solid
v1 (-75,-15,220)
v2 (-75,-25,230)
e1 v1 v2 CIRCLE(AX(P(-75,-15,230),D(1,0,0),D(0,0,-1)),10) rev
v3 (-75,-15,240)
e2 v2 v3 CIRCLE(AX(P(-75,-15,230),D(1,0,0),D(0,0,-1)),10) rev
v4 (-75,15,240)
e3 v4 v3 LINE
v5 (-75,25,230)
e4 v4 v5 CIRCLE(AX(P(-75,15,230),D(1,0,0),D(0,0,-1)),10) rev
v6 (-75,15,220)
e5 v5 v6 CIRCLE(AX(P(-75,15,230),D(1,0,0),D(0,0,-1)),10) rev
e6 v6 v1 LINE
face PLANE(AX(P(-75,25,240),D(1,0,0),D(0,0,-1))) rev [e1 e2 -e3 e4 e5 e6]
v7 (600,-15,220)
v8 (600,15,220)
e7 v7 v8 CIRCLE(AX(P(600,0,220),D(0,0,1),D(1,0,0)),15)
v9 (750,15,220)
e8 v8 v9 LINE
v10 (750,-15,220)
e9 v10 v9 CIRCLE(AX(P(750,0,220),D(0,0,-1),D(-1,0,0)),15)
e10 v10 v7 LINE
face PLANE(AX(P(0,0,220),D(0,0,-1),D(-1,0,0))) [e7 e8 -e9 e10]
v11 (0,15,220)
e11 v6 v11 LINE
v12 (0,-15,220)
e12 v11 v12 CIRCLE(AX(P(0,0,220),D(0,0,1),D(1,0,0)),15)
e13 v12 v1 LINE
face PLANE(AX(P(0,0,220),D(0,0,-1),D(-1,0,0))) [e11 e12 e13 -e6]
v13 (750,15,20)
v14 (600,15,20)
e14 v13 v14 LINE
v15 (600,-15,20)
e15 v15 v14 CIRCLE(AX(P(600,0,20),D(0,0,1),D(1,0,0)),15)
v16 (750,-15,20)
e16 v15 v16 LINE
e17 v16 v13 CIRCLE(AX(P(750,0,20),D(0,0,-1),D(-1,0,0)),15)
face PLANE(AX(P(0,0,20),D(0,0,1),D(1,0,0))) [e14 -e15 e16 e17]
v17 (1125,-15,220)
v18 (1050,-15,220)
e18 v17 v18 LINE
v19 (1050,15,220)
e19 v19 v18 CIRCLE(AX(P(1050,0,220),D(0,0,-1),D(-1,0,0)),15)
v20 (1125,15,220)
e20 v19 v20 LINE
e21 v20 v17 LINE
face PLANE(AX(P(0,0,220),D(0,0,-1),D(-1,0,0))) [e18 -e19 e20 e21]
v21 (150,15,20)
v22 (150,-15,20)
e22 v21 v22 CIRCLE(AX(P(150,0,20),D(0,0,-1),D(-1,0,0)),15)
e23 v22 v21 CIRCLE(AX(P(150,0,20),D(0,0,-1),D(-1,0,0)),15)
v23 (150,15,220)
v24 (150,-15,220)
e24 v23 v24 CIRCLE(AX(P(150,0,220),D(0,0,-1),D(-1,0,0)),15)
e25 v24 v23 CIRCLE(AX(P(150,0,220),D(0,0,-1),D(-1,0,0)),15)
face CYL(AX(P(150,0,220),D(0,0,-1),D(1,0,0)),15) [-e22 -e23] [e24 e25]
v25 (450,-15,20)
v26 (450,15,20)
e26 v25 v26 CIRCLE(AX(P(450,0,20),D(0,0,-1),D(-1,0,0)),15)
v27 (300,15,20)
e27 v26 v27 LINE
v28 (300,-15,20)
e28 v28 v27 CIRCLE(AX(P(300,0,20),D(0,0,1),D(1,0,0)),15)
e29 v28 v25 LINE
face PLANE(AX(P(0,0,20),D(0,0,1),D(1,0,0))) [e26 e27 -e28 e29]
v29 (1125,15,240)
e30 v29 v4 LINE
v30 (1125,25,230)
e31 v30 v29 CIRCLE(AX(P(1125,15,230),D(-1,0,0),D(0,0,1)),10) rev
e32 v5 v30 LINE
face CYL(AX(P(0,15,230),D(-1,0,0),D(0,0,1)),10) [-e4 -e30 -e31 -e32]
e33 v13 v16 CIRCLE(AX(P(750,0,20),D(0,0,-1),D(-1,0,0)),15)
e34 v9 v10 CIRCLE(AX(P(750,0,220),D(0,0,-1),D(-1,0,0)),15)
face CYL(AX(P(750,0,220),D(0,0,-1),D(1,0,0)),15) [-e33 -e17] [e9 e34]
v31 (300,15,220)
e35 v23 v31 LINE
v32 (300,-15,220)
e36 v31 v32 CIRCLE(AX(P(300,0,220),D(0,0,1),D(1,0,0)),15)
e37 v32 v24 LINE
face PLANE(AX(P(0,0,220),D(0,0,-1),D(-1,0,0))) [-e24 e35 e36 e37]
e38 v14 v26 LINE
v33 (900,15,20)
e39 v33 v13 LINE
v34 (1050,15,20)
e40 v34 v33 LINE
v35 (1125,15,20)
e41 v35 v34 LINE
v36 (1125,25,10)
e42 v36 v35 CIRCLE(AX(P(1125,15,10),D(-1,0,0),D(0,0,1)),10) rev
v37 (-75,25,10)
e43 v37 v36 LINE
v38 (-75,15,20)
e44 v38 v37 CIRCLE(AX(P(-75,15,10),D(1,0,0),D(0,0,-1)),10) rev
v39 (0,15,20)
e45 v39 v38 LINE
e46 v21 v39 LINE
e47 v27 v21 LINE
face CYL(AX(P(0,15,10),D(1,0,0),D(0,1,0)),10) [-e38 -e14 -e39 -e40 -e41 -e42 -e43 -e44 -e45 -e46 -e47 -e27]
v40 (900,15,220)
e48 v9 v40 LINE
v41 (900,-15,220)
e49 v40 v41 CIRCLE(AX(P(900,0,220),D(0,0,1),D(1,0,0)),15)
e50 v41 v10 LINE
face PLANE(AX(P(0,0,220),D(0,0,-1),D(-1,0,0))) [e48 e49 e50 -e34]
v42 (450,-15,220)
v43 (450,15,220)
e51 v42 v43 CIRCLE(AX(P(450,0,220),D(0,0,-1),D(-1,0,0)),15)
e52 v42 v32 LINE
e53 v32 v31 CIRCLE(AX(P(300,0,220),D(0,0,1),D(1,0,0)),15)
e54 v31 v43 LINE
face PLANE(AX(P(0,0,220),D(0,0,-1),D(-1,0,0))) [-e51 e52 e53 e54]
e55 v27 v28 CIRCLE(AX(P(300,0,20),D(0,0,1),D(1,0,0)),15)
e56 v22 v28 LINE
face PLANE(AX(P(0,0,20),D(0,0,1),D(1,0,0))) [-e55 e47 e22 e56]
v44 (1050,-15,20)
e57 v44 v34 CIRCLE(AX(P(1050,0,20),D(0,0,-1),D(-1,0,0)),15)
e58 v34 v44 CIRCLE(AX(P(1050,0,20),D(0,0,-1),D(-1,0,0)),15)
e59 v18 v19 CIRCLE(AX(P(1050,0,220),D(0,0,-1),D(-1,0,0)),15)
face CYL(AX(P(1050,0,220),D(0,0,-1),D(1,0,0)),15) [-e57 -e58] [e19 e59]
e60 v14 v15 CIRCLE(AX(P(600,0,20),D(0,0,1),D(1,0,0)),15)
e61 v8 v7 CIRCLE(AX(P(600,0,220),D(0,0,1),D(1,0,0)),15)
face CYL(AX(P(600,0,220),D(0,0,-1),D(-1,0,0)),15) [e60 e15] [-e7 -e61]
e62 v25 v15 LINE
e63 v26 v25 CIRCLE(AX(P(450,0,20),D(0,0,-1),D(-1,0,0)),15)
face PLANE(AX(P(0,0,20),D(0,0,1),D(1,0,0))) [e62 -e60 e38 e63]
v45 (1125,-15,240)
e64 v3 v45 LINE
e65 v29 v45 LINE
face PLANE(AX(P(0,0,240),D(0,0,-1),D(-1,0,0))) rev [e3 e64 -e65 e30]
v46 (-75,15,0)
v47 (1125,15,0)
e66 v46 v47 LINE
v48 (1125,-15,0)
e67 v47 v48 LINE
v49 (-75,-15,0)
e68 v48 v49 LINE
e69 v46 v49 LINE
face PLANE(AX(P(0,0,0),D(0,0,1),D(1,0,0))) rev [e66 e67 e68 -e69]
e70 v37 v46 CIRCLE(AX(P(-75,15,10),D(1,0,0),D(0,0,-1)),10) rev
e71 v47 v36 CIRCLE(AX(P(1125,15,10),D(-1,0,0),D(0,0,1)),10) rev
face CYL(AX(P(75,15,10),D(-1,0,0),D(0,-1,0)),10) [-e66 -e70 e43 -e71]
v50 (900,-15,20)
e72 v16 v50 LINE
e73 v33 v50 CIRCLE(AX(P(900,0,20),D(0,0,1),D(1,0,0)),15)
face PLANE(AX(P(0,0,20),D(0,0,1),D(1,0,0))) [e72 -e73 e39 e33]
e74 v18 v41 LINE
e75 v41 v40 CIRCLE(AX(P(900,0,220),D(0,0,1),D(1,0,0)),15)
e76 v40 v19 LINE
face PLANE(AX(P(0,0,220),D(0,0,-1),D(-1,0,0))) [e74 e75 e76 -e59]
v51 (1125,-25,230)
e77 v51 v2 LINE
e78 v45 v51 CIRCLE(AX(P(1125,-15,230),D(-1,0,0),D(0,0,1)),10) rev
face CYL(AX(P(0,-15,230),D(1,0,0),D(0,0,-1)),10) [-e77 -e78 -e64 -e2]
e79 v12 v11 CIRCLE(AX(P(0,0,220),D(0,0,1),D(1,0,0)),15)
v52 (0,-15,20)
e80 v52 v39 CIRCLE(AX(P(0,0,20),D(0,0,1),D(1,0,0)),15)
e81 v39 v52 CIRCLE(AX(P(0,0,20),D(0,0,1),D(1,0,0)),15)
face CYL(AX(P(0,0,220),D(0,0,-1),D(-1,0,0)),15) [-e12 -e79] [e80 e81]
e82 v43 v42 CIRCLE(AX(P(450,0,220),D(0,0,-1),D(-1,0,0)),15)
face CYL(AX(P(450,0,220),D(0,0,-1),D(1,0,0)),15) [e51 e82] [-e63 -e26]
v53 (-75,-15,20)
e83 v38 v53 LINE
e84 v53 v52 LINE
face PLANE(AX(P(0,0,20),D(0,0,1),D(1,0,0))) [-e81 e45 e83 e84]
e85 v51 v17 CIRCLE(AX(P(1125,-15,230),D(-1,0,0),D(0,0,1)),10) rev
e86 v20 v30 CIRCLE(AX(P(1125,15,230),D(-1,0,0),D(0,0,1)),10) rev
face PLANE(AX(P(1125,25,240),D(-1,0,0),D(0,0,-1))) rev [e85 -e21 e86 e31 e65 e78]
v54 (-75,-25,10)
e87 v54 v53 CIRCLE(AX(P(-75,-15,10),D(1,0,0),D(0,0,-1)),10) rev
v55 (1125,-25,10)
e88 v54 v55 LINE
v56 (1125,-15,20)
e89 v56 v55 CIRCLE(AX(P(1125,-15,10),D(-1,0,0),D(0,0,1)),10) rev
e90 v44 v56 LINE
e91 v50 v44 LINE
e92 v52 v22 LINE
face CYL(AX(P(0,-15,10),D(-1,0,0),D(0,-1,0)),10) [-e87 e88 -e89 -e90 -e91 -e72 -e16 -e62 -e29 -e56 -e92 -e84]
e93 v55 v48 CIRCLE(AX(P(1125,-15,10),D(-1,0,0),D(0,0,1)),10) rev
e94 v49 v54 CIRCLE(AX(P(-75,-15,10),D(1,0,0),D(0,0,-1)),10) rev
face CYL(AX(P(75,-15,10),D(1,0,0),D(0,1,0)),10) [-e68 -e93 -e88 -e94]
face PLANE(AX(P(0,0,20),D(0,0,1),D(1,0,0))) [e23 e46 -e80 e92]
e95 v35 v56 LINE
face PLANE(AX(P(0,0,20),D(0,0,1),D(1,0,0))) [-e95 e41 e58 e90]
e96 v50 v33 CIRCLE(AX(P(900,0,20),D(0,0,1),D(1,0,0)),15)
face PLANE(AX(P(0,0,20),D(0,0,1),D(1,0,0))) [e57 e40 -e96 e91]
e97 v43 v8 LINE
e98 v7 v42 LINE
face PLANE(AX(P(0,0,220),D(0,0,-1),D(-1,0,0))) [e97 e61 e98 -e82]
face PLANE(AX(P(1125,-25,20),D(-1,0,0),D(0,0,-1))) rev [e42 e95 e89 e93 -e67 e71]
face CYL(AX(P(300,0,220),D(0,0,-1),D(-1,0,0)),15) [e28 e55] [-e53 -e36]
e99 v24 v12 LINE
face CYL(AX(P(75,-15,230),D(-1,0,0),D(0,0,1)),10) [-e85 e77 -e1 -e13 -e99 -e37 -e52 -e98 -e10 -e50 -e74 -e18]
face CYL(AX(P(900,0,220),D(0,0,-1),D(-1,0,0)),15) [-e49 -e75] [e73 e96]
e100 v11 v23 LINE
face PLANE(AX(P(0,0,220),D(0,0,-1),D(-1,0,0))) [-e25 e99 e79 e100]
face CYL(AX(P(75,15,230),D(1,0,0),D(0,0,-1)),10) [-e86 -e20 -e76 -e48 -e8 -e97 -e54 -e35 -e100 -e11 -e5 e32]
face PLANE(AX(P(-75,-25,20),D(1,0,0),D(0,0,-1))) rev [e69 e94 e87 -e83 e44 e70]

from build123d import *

# Parameters (mm, degrees)
SKETCH3_W           = 150
SKETCH3_H           = 50
BOSS_EXTRUDE1_DEPTH = 20
SKETCH4_R           = 15
BOSS_EXTRUDE2_DEPTH = 200
SKETCH5_W           = 150
SKETCH5_H           = 50
BOSS_EXTRUDE3_DEPTH = 20
FILLET2_R           = 10


with BuildPart() as part:
    # Sketch3 → Boss-Extrude1 (new body)
    with BuildSketch(Plane.XY):
        Rectangle(SKETCH3_W, SKETCH3_H)
    extrude(amount=BOSS_EXTRUDE1_DEPTH)

    # Sketch4 → Boss-Extrude2 (add)
    with BuildSketch(Plane.XY.offset(20)):
        Circle(SKETCH4_R)
    extrude(amount=BOSS_EXTRUDE2_DEPTH)

    # Sketch5 → Boss-Extrude3 (add)
    with BuildSketch(Plane.XY.offset(220)):
        Rectangle(SKETCH5_W, SKETCH5_H)
    extrude(amount=BOSS_EXTRUDE3_DEPTH)

    # Mirror1: part across plane


with BuildPart() as part_1:
    add(part.part)
    add(part.part.mirror(Plane(origin=(75, -25, 20), x_dir=(0, 0, 1), z_dir=(-1, 0, 0))))

    # Mirror2: part across plane


with BuildPart() as part_2:
    add(part_1.part)
    add(part_1.part.mirror(Plane(origin=(225, 25, 240), x_dir=(0, 0, 1), z_dir=(-1, 0, 0))))

    # Mirror3: part across plane


with BuildPart() as part_3:
    add(part_2.part)
    add(part_2.part.mirror(Plane(origin=(525, 25, 240), x_dir=(0, 0, 1), z_dir=(-1, 0, 0))))

    # Fillet2
    fillet2_edges = [part_3.edges().sort_by_distance(p)[0] for p in [
        (525, -25, 20),
        (525, -25, 0),
        (525, 25, 0),
        (525, 25, 20),
        (525, 25, 220),
        (525, 25, 240),
        (525, -25, 220),
        (525, -25, 240),
    ]]
    fillet(fillet2_edges, radius=FILLET2_R - 0.0001)  # a hair under: the kernel refuses the full size


solid = part_3.part
